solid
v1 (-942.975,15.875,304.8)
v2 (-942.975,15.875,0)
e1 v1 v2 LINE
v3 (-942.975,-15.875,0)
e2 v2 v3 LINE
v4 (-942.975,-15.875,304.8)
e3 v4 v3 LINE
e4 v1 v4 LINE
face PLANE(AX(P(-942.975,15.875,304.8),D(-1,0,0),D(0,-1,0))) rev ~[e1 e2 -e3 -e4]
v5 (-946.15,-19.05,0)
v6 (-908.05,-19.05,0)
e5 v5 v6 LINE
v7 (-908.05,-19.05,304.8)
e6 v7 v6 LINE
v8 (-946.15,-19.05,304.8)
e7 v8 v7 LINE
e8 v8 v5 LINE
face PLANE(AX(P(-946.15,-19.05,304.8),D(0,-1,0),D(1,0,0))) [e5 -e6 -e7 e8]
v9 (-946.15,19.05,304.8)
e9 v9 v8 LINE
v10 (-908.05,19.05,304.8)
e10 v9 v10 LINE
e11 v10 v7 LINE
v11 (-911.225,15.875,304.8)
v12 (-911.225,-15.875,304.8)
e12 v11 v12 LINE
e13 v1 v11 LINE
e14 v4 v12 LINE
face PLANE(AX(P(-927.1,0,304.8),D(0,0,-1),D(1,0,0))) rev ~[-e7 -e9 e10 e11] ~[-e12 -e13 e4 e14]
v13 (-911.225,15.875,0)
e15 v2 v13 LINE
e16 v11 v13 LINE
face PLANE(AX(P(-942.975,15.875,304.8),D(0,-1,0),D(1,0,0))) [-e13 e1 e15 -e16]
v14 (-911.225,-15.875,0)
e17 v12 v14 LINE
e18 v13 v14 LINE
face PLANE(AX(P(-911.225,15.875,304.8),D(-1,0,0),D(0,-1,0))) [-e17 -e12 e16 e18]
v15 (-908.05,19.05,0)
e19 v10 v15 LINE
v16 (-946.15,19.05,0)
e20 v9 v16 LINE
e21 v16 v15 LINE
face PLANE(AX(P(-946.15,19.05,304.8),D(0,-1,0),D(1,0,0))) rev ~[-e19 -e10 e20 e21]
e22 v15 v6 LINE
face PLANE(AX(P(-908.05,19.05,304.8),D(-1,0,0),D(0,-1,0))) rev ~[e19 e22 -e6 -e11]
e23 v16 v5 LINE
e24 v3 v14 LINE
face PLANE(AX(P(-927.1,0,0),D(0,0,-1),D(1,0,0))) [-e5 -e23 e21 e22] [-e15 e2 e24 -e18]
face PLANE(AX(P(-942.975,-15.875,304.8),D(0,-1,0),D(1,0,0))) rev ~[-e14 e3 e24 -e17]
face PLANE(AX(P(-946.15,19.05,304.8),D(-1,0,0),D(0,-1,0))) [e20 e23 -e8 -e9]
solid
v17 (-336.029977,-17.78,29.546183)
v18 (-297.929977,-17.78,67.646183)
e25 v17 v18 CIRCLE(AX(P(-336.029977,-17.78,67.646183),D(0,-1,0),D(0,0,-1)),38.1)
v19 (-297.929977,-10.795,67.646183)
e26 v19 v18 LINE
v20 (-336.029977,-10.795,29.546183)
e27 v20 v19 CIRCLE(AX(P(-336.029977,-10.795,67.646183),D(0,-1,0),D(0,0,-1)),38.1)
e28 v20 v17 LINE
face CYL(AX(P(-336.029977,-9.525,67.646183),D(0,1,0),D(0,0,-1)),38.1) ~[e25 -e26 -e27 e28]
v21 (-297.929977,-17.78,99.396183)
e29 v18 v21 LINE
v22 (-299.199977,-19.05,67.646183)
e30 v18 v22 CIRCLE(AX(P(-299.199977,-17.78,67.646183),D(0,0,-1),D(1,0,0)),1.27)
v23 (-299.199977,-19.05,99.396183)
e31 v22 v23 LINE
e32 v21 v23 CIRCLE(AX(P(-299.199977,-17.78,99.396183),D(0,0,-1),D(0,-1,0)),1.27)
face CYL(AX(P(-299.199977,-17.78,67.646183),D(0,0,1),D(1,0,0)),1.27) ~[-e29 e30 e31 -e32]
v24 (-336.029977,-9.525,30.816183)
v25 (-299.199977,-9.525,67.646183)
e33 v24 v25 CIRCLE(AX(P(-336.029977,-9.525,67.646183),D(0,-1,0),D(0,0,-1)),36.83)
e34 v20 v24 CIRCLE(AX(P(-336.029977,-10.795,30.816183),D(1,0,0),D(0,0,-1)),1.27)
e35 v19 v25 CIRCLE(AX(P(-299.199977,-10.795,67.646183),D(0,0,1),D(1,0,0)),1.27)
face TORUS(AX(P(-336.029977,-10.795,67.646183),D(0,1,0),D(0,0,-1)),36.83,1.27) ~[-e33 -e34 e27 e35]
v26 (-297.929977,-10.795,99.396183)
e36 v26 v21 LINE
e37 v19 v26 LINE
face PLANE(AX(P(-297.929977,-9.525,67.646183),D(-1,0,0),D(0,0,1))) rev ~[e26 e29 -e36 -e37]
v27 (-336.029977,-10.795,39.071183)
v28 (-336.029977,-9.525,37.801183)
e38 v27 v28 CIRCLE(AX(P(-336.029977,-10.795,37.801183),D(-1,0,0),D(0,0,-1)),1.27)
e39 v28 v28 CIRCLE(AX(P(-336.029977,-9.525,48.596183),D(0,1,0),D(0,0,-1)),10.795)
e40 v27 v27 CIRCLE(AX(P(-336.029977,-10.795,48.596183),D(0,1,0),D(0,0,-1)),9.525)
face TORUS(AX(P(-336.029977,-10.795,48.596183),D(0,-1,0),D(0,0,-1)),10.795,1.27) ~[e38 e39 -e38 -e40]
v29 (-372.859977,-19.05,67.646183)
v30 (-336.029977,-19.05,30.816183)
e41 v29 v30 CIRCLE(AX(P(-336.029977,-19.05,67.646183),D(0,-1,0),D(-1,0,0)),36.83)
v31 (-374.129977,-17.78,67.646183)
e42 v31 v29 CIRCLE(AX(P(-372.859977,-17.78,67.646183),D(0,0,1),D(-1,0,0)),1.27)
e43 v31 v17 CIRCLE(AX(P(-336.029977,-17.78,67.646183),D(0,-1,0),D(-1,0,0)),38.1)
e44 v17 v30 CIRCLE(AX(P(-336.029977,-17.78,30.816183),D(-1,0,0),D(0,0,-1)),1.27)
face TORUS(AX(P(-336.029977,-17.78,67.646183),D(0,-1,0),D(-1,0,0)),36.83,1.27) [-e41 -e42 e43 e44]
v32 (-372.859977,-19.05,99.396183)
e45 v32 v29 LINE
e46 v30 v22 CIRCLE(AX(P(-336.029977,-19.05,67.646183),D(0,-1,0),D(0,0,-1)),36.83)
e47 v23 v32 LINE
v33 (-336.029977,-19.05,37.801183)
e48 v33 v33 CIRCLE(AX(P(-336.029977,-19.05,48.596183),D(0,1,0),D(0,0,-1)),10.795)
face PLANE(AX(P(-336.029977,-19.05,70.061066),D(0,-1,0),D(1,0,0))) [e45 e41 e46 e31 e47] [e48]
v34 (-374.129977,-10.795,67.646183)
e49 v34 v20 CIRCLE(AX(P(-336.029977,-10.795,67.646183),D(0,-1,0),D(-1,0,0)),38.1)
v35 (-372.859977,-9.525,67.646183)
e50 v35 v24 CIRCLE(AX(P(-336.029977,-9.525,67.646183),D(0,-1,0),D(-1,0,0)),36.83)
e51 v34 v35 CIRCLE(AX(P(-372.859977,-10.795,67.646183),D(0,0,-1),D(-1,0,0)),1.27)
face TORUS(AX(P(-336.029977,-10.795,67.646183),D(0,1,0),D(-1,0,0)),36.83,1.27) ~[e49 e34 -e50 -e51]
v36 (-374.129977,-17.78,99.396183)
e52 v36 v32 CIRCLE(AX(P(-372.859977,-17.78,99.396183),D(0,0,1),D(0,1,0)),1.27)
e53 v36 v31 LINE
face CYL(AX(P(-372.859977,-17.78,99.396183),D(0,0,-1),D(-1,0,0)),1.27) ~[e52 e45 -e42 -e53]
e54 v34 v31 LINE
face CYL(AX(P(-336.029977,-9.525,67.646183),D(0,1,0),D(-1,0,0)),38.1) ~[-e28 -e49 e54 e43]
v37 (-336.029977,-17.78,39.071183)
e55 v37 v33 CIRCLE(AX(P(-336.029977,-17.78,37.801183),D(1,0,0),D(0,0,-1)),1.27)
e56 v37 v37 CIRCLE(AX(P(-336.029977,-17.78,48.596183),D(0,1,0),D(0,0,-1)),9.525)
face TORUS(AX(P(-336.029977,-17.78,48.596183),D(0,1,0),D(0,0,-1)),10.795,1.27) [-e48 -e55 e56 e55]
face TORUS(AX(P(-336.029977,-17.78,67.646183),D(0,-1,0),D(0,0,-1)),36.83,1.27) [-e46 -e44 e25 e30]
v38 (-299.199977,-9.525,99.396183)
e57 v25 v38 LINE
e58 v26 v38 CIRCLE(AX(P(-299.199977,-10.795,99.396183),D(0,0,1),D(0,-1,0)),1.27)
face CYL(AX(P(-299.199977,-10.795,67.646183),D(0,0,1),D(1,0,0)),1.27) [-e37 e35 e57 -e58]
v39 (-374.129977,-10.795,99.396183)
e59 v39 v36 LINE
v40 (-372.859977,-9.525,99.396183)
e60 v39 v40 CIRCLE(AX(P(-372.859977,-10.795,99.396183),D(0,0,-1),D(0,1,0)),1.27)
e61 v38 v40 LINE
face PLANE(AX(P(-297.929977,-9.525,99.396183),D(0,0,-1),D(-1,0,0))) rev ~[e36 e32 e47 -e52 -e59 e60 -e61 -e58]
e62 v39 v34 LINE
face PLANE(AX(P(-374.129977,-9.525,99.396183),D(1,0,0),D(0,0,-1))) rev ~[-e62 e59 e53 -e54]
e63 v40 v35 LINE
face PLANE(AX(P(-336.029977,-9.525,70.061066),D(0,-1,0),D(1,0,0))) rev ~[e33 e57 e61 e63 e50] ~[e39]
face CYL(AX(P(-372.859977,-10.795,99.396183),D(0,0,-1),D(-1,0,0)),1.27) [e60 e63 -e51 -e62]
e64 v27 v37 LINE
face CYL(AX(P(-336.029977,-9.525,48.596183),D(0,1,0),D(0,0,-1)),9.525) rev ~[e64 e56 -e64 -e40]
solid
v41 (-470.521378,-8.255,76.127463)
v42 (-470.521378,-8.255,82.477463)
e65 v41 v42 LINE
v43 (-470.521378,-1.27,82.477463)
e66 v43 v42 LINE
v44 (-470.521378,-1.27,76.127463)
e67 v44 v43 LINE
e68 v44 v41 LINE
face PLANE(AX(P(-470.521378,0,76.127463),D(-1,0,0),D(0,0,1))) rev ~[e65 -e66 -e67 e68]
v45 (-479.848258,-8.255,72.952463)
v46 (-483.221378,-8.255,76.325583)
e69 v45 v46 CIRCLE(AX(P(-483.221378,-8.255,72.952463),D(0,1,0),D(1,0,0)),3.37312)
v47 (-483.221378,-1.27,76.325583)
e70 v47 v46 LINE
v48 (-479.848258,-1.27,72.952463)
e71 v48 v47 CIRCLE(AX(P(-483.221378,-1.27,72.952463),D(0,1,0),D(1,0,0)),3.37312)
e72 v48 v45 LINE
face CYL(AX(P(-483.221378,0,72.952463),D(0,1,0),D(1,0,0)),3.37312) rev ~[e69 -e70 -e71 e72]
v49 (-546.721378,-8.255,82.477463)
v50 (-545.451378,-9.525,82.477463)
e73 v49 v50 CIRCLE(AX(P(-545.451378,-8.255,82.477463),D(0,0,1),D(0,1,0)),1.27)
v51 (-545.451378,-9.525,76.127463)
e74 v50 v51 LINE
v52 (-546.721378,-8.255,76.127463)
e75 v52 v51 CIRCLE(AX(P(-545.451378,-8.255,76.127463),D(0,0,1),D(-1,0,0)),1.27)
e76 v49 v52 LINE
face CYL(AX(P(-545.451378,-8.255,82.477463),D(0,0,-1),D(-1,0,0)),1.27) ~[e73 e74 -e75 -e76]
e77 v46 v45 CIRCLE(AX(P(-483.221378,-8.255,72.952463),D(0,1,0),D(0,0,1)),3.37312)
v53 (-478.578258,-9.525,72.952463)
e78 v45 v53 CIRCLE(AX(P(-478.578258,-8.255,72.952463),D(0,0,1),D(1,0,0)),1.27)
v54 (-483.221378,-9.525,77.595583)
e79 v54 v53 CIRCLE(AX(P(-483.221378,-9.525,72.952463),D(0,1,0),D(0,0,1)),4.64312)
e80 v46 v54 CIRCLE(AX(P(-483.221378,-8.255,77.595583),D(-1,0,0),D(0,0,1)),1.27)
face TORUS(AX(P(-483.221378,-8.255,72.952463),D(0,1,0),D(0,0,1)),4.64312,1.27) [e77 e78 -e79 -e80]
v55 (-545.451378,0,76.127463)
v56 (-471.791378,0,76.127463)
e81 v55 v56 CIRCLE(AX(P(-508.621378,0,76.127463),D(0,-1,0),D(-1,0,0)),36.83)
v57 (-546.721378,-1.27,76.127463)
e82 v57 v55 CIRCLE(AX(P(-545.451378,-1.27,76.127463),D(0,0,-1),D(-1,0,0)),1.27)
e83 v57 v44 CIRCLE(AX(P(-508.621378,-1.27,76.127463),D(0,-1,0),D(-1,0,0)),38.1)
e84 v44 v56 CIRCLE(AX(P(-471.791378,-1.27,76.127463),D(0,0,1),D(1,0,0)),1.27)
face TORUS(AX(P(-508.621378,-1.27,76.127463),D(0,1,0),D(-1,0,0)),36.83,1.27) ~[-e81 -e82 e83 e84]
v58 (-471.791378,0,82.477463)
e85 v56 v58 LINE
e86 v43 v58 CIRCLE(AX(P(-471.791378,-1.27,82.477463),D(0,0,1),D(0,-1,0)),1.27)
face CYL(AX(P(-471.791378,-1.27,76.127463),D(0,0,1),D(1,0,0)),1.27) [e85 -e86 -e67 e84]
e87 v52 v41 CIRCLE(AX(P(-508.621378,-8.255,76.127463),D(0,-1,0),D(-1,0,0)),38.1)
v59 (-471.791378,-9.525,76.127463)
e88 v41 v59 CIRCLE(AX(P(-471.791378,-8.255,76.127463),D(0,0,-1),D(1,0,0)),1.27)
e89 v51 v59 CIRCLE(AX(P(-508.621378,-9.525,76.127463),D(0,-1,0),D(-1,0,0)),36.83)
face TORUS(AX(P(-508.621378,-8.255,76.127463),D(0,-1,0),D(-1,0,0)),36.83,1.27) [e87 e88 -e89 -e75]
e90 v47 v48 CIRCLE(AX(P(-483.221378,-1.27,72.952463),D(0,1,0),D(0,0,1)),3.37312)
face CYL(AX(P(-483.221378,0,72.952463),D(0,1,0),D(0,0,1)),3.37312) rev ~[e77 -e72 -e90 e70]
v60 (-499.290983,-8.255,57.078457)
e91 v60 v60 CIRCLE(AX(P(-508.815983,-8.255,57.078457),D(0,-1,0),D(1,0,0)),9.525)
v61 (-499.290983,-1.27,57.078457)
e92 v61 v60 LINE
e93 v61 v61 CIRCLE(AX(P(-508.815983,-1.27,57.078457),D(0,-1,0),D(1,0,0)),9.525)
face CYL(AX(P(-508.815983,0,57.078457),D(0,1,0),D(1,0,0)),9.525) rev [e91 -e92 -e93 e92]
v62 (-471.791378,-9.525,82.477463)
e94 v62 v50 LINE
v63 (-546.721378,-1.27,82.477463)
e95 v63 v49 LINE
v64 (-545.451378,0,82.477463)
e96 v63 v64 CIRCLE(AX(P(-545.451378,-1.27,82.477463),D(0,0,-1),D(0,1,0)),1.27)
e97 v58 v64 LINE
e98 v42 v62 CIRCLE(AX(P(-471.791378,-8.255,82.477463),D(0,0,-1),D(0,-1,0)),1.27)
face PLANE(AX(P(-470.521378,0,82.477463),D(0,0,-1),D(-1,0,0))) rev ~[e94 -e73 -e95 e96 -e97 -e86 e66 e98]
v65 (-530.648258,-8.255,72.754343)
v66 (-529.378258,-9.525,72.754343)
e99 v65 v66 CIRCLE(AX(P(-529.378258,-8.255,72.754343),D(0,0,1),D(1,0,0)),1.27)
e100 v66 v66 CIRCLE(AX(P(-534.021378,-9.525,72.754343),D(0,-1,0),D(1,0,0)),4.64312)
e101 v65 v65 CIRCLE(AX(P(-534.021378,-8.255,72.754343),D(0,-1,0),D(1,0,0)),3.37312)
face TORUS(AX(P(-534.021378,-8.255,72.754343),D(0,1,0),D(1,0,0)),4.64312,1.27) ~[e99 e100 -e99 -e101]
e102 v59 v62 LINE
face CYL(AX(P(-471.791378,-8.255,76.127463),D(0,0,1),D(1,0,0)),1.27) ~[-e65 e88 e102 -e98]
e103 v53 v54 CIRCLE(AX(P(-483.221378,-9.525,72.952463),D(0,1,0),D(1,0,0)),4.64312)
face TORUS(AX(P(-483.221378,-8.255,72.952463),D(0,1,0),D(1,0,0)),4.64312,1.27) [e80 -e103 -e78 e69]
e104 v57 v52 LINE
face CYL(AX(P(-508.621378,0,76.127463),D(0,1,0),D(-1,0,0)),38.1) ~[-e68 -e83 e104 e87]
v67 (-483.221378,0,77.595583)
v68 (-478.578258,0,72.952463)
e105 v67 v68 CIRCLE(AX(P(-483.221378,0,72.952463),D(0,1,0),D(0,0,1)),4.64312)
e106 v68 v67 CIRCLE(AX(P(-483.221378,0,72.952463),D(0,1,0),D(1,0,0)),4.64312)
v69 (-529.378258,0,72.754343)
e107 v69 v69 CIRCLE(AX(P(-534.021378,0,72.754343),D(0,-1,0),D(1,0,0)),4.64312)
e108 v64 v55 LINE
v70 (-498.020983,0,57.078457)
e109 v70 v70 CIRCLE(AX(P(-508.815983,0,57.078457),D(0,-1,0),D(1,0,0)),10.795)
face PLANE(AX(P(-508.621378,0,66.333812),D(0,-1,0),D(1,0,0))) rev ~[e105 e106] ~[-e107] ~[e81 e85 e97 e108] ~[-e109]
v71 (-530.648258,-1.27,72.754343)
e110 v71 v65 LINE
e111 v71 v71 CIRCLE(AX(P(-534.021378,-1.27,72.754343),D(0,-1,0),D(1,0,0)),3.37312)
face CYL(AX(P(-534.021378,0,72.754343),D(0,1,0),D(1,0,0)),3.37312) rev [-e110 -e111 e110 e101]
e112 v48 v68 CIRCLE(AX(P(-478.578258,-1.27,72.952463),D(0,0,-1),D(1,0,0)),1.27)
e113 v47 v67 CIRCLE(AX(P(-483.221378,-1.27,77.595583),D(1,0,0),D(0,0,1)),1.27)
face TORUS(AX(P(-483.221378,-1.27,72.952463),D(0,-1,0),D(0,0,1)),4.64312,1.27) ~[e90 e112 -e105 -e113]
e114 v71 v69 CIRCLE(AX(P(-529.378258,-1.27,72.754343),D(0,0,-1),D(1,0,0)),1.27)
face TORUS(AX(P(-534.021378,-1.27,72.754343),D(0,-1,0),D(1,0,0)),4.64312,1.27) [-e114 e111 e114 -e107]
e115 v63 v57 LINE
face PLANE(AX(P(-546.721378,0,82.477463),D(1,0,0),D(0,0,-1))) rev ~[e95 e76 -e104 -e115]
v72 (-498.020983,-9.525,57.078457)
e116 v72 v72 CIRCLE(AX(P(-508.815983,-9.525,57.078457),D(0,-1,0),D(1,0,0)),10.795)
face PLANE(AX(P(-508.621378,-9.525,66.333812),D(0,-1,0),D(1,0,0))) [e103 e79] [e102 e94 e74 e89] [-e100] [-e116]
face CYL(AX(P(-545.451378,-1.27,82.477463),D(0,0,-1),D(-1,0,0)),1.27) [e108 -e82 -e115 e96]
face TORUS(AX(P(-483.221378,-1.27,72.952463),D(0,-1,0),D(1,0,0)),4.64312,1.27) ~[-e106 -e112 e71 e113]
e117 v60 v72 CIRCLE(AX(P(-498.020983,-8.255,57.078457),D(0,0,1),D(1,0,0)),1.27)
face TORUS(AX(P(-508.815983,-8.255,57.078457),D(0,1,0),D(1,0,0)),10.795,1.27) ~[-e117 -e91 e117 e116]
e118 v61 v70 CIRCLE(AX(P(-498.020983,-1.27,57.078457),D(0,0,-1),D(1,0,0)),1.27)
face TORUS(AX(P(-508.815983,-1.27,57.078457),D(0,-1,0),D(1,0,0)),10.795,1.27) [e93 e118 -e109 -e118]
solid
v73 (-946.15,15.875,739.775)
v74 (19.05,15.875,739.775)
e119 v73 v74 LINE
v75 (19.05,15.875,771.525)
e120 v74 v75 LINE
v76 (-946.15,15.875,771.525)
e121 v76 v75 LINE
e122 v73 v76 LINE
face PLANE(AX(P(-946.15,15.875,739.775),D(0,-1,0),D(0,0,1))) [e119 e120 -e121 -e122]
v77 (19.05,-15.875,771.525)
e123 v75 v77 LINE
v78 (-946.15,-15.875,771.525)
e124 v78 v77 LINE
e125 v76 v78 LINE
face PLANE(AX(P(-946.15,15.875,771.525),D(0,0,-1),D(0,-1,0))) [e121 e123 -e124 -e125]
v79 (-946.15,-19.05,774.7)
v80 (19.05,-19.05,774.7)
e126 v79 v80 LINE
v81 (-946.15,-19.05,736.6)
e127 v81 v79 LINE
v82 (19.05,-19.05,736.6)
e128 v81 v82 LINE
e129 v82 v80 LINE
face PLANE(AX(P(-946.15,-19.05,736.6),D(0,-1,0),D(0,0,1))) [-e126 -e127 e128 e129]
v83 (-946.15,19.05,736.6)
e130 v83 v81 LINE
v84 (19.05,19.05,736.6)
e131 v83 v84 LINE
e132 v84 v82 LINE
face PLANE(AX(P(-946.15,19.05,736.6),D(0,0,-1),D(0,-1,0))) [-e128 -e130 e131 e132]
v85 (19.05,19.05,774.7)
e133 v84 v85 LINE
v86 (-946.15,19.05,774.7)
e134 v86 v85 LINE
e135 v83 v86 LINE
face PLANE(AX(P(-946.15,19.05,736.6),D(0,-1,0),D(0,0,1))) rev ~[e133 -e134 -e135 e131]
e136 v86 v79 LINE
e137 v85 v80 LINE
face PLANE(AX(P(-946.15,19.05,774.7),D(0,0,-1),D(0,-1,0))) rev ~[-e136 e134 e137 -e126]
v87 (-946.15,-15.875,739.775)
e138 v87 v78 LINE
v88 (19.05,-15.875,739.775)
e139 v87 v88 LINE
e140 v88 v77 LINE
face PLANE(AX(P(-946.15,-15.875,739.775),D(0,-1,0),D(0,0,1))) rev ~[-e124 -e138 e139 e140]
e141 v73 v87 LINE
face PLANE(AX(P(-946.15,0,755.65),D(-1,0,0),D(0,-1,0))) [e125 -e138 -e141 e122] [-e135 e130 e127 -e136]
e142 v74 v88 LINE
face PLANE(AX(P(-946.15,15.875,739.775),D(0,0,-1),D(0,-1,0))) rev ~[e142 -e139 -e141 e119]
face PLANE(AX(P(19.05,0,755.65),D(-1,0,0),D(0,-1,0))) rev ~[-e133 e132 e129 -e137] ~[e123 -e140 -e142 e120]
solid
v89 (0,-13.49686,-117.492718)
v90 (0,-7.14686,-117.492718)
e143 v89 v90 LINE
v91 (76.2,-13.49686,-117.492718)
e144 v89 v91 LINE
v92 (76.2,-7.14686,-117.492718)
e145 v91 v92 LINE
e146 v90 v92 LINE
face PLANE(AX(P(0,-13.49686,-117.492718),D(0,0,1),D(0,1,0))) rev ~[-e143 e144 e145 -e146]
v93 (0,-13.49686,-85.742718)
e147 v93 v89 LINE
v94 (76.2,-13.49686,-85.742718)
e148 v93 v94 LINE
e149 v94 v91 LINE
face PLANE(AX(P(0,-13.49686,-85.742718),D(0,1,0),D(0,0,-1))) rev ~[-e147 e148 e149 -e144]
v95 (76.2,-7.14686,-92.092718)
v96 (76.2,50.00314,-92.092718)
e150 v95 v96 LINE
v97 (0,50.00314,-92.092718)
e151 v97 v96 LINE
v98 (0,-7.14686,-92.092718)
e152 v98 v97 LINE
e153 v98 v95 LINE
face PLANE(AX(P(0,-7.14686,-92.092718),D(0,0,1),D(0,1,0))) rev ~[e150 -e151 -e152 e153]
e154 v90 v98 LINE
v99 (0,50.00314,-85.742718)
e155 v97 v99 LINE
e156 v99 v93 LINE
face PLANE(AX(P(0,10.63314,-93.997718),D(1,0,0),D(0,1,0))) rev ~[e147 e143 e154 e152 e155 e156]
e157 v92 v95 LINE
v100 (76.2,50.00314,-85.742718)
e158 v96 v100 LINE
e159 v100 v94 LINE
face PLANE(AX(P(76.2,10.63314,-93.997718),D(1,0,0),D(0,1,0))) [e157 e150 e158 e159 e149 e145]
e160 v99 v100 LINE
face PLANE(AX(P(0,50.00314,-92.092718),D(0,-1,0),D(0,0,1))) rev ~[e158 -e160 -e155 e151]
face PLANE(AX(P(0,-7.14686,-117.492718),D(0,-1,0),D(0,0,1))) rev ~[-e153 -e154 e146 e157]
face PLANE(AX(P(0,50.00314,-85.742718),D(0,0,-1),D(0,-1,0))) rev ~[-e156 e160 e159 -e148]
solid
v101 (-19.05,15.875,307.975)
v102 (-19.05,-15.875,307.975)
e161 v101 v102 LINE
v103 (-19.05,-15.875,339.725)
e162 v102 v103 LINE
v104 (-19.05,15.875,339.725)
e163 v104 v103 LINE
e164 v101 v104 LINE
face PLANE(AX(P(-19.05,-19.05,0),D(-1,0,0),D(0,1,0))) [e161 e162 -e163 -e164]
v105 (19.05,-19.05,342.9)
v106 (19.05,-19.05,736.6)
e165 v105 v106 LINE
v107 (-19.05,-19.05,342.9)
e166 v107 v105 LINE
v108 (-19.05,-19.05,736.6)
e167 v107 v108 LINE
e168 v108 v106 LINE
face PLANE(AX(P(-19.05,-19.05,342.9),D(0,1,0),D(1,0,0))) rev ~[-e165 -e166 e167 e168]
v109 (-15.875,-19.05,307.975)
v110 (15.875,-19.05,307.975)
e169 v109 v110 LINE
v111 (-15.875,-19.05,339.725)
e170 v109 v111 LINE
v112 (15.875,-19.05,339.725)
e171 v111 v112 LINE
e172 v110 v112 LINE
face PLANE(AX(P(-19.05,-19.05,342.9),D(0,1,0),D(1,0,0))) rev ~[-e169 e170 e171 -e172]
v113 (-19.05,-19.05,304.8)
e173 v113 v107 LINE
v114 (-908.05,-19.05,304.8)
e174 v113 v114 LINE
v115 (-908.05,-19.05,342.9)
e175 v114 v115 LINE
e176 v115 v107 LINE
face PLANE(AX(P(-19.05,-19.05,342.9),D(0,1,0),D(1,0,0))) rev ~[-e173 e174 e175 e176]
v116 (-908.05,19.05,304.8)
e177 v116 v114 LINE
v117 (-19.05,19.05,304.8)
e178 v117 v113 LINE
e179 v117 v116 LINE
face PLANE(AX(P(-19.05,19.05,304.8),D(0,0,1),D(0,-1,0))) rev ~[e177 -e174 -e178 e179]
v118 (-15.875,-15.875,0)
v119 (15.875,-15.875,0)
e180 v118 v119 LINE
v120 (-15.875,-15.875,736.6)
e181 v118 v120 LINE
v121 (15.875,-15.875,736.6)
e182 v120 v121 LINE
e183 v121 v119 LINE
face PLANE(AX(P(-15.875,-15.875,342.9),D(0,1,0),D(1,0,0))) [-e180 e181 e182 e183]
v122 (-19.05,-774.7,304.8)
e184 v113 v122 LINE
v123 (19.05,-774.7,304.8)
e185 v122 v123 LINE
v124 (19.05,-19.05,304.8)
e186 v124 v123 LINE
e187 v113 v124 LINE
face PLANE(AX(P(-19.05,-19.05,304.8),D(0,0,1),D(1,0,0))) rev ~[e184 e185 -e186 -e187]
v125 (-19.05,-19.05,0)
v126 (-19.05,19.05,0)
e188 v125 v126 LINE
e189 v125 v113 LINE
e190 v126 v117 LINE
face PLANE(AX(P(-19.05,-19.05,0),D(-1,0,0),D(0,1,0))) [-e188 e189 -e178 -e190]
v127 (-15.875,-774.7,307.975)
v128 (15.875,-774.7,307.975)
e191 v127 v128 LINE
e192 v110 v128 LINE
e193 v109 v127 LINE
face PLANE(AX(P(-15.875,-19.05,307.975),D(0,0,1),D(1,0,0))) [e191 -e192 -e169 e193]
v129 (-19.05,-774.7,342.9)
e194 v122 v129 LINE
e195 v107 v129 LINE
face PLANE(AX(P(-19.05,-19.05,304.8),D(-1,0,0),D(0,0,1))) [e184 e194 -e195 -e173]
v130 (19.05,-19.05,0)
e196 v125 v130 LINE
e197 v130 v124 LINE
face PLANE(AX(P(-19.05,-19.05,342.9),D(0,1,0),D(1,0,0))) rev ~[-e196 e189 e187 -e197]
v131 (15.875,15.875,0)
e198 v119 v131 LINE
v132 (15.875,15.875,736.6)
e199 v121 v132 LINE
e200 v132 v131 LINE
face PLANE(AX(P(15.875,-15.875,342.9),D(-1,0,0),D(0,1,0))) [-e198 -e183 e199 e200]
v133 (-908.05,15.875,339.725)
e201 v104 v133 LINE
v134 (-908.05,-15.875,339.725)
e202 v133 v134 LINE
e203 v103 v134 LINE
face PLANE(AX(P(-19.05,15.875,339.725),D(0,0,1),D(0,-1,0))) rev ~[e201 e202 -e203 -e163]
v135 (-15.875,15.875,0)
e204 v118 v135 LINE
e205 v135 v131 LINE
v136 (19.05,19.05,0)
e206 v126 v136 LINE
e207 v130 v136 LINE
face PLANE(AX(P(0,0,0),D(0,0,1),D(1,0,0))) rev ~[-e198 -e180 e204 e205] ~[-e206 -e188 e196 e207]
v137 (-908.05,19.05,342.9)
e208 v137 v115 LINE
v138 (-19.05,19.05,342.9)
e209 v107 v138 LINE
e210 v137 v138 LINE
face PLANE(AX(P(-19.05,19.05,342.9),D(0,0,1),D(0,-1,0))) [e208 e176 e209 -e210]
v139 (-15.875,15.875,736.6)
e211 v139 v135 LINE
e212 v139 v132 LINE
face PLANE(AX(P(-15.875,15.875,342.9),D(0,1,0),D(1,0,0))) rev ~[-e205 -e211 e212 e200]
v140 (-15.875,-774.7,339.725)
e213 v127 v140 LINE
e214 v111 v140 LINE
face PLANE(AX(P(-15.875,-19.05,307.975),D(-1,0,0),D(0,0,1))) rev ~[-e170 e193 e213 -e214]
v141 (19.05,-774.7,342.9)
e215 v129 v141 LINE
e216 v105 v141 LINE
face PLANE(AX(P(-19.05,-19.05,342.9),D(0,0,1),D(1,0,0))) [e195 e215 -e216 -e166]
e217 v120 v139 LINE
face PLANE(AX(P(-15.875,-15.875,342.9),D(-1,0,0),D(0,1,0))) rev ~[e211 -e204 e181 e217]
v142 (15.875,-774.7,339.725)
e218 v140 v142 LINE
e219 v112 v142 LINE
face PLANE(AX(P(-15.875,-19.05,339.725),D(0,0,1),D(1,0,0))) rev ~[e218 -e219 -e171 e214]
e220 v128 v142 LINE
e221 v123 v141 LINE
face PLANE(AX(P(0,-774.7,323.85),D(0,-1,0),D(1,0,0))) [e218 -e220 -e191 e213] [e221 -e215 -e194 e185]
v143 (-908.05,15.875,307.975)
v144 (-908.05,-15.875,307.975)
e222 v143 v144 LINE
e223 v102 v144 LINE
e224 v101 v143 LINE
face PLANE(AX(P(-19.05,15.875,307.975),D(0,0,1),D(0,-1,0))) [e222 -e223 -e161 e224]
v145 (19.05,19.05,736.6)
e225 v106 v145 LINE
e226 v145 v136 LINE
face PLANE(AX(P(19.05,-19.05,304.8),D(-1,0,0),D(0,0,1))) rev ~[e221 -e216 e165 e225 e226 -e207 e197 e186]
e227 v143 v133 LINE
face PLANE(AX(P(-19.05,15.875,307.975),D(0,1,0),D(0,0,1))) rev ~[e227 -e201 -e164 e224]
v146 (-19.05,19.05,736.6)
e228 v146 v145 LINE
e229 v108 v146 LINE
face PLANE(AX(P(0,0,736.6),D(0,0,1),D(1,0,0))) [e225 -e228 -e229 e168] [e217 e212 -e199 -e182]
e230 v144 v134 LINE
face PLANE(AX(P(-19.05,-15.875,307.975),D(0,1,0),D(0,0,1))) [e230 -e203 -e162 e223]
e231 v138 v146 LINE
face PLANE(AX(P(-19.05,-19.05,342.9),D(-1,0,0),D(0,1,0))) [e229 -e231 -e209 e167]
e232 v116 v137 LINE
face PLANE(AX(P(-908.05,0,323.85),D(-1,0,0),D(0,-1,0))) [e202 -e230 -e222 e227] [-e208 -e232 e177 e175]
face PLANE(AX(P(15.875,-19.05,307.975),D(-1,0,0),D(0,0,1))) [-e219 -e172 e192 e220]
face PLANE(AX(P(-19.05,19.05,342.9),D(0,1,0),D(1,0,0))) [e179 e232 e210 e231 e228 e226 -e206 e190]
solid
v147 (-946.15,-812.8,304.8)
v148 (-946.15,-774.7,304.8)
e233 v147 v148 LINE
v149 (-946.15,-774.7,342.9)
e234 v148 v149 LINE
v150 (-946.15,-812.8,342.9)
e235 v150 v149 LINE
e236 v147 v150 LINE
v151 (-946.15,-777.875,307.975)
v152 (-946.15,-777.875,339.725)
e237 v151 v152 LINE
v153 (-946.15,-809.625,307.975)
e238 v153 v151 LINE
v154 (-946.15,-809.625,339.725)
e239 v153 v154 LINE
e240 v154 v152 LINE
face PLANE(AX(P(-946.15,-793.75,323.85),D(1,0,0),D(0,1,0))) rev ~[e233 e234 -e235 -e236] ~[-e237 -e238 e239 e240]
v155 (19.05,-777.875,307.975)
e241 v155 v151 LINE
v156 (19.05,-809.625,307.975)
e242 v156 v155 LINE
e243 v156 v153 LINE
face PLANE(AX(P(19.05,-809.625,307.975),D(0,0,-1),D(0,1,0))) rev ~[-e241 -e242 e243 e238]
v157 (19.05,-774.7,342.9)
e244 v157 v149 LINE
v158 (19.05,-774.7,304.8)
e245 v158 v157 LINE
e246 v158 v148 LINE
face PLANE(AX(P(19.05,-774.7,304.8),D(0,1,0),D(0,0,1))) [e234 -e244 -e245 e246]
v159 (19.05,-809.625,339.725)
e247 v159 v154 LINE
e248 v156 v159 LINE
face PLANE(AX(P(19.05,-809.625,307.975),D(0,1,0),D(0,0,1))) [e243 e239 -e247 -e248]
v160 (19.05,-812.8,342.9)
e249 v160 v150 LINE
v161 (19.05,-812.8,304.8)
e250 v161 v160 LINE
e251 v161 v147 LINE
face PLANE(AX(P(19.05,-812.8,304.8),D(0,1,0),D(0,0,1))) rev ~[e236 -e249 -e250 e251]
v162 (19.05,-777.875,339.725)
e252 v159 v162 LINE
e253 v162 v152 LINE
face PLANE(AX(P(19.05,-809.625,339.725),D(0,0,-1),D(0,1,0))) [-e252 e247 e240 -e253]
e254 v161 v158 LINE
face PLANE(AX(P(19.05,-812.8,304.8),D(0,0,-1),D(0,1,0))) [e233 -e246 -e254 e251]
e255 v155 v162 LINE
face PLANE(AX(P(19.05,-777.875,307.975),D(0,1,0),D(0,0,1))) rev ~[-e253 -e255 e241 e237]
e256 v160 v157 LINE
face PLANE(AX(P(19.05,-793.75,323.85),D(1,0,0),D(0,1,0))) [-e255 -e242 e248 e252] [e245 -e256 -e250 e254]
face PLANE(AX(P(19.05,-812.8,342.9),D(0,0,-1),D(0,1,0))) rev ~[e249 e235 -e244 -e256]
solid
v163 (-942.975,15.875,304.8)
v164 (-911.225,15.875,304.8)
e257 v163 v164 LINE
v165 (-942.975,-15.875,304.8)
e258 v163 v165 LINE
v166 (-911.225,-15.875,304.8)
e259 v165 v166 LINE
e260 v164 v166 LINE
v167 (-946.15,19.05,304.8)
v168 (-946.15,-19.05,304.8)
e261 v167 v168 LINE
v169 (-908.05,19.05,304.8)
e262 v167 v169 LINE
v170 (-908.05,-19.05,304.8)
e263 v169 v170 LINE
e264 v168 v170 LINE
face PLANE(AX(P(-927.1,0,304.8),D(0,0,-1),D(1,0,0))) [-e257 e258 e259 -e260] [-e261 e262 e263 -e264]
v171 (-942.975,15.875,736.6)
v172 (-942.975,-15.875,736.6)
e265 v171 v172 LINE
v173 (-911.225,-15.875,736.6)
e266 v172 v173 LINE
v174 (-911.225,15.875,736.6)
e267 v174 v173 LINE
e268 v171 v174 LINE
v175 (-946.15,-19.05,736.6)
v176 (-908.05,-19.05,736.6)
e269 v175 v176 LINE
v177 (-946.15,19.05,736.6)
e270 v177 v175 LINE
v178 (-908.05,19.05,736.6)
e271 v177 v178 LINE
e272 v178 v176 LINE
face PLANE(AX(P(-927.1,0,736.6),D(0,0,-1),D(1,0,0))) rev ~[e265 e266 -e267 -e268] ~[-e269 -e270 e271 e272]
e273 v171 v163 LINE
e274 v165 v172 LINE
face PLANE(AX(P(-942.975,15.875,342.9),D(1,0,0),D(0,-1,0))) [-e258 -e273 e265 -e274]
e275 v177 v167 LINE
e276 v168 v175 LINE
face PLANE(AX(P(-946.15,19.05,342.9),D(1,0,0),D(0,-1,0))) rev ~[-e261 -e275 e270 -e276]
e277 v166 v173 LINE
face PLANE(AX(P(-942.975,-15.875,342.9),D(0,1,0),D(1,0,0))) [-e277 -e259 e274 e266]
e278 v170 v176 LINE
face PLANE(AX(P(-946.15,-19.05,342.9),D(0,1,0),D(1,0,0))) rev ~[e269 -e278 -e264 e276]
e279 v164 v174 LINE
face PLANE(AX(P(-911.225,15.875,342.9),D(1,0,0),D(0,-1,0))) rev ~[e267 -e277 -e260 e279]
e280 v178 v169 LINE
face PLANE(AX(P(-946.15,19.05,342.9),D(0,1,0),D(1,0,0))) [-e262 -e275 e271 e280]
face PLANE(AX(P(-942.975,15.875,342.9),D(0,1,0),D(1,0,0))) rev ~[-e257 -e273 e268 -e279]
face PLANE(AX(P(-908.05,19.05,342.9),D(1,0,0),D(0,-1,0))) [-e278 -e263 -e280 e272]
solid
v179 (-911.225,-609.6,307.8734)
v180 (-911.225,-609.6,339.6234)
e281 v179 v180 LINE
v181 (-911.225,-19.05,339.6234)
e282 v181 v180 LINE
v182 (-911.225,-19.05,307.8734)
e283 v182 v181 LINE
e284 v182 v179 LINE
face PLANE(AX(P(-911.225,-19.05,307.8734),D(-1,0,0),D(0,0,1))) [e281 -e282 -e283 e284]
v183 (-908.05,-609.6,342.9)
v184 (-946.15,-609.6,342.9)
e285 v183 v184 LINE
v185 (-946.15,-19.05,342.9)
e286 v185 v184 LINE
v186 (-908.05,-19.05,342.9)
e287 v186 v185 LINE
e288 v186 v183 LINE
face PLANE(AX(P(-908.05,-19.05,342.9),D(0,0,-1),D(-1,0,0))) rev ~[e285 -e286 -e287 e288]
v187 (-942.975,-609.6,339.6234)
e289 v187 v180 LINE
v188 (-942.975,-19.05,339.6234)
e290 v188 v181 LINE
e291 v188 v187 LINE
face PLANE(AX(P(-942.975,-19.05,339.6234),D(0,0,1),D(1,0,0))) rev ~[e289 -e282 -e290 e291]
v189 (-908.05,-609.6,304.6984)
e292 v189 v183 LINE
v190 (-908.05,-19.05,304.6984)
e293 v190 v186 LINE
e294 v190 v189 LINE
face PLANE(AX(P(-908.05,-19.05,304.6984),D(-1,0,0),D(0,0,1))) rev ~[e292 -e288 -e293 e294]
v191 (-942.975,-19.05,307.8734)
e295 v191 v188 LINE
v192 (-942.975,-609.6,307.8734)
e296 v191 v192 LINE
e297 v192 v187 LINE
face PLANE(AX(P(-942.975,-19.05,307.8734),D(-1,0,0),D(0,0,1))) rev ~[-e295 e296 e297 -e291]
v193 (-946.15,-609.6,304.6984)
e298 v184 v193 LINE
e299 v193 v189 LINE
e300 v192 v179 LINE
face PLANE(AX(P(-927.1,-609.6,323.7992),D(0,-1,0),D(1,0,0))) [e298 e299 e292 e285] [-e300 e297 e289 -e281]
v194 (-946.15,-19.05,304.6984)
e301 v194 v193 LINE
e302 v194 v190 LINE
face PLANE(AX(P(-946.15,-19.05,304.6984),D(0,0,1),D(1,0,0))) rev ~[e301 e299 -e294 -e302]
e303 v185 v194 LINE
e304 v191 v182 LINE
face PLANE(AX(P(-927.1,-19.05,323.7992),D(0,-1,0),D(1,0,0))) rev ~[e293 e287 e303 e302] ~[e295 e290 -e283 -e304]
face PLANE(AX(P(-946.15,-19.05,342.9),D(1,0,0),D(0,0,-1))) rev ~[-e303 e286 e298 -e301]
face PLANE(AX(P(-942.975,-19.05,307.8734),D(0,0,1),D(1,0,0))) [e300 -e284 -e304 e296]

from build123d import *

# Parameters (mm, degrees)
F0_W      = 38.1
F0_H      = 38.1
F0_W_2    = 31.75
F0_H_2    = 31.75
F1_DEPTH  = 342.9
F2_W      = 38.1
F2_H      = 38.1
F2_W_2    = 31.75
F2_H_2    = 31.75
F3_DEPTH  = 889
F4_W      = 38.1
F4_H      = 38.1
F4_W_2    = 31.75
F4_H_2    = 31.75
F5_DEPTH  = 304.8
F6_DEPTH  = 38.1
F7_DEPTH  = 393.7
F8_W      = 38.1
F8_H      = 38.1
F8_W_2    = 31.75
F8_H_2    = 31.75
F9_DEPTH  = 393.7
F10_W     = 38.1
F10_H     = 38.1
F10_W_2   = 31.75
F10_H_2   = 31.75
F11_DEPTH = 965.2
F12_W     = 31.75
F12_H     = 31.75
F13_DEPTH = 590.55
F14_W     = 38.1
F14_H     = 38.1
F14_W_2   = 31.75
F14_H_2   = 31.75
F15_DEPTH = 755.65
F17_DEPTH = 76.2
F18_R     = 9.525
F18_R_2   = 3.37312
F19_DEPTH = 9.525
F20_R     = 1.27
F22_DEPTH = 9.525
F23_R     = 1.27
F24_W     = 38.1
F24_H     = 38.1
F24_W_2   = 31.75
F24_H_2   = 31.75
F25_DEPTH = 965.2


with BuildPart() as f1:
    # F0 (on Top) → F1 (new body)
    with BuildSketch(Plane.XY):
        Rectangle(F0_W, F0_H)
        Rectangle(F0_W_2, F0_H_2, mode=Mode.SUBTRACT)
    extrude(amount=F1_DEPTH)

    # F2 (on face) → F3 (join)
    with BuildSketch(Plane(origin=(-19.05, 0, 0), x_dir=(0, -1, 0), z_dir=(-1, 0, 0))):
        with Locations((0, 323.85)):
            Rectangle(F2_W, F2_H)
        with Locations((0, 323.85)):
            Rectangle(F2_W_2, F2_H_2, mode=Mode.SUBTRACT)
    extrude(amount=F3_DEPTH)

    # F8 (on face) → F9 (join)
    with BuildSketch(Plane.XY.offset(342.9)):
        Rectangle(F8_W, F8_H)
        Rectangle(F8_W_2, F8_H_2, mode=Mode.SUBTRACT)
    extrude(amount=F9_DEPTH)

    # F14 (on face) → F15 (join)
    with BuildSketch(Plane.XZ.offset(19.05)):
        with Locations((0, 323.85)):
            Rectangle(F14_W, F14_H)
        with Locations((0, 323.85)):
            Rectangle(F14_W_2, F14_H_2, mode=Mode.SUBTRACT)
    extrude(amount=F15_DEPTH)


with BuildPart() as f5:
    # F4 (on face) → F5 (new body)
    with BuildSketch(Plane(origin=(0, 0, 304.8), x_dir=(1, 0, 0), z_dir=(0, 0, -1))):
        with Locations((-927.1, 0)):
            Rectangle(F4_W, F4_H)
        with Locations((-927.1, 0)):
            Rectangle(F4_W_2, F4_H_2, mode=Mode.SUBTRACT)
    extrude(amount=F5_DEPTH)


with BuildPart() as f6:
    # F6 (new): a face of the model
    f6_faces = [f5.part.faces().sort_by_distance(p)[0] for p in [
        (-908.5888153673, 0, 304.8),
    ]]
    extrude(f6_faces, amount=F6_DEPTH)

    # F7 (add): a face of the model
    f7_faces = [f6.faces().sort_by_distance(p)[0] for p in [
        (-908.5888153673, 0, 342.9),
    ]]
    extrude(f7_faces, amount=F7_DEPTH)


with BuildPart() as f11:
    # F10 (on face) → F11 (new body)
    with BuildSketch(Plane(origin=(-946.15, 0, 0), x_dir=(0, -1, 0), z_dir=(-1, 0, 0))):
        with Locations((0, 755.65)):
            Rectangle(F10_W, F10_H)
        with Locations((0, 755.65)):
            Rectangle(F10_W_2, F10_H_2, mode=Mode.SUBTRACT)
    extrude(amount=-F11_DEPTH)


with BuildPart() as f13:
    # F12 (on face) → F13 (new body)
    with BuildSketch(Plane.XZ.offset(19.05)):
        Polygon((-908.05, 304.8), (-908.05, 342.9), (-946.15, 342.9), (-946.15, 304.6984), (-908.05, 304.6984), align=None)
        with Locations((-927.1, 323.7484)):
            Rectangle(F12_W, F12_H, mode=Mode.SUBTRACT)
    extrude(amount=F13_DEPTH)


with BuildPart() as f17:
    # F16 (on Right) → F17 (new body)
    with BuildSketch(Plane.YZ):
        Polygon((50.0031399928, -92.0927183867), (50.0031399928, -85.7427183867), (-13.4968600072, -85.7427183867), (-13.4968600072, -117.4927183867), (-7.1468600072, -117.4927183867), (-7.1468600072, -92.0927183867), align=None)
    extrude(amount=F17_DEPTH)


with BuildPart() as f19:
    # F18 (on Front) → F19 (new body)
    with BuildSketch(Plane.XZ):
        with BuildLine():
            Line((-546.7213775635, 82.477462914), (-546.7213775635, 76.127462914))
            ThreePointArc((-546.7213775635, 76.127462914), (-508.6213775635, 38.027462914), (-470.5213775635, 76.127462914))
            Line((-470.5213775635, 76.127462914), (-470.5213775635, 82.477462914))
            Line((-470.5213775635, 82.477462914), (-483.2213775635, 82.477462914))
            Line((-483.2213775635, 82.477462914), (-546.7213775635, 82.477462914))
        make_face()
        with Locations((-508.8159826909, 57.0784569335)):
            Circle(F18_R, mode=Mode.SUBTRACT)
        with Locations((-534.0213775635, 72.754342914)):
            Circle(F18_R_2, mode=Mode.SUBTRACT)
        with BuildLine():
            ThreePointArc((-479.8482575635, 72.952462914), (-485.6065335892, 70.5673068883), (-483.2213775635, 76.325582914))
            ThreePointArc((-483.2213775635, 76.325582914), (-480.8362215377, 75.3376189398), (-479.8482575635, 72.952462914))
        make_face(mode=Mode.SUBTRACT)
    extrude(amount=F19_DEPTH)

    # F20
    f20_edges = [f19.edges().sort_by_distance(p)[0] for p in [
        (-537.394498, -9.525, 72.754343),
        (-518.340983, -9.525, 57.078457),
        (-483.221378, -9.525, 69.579343),
        (-508.621378, -9.525, 38.027463),
        (-483.221378, 0, 69.579343),
        (-537.394498, 0, 72.754343),
        (-518.340983, 0, 57.078457),
        (-508.621378, 0, 38.027463),
    ]]
    fillet(f20_edges, radius=F20_R)


with BuildPart() as f22:
    # F21 (on face) → F22 (new body)
    with BuildSketch(Plane.XZ.offset(9.525)):
        with BuildLine():
            Line((-374.1299766064, 99.3961830735), (-374.1299766064, 67.6461830735))
            ThreePointArc((-374.1299766064, 67.6461830735), (-362.9707449696, 40.7054147103), (-336.0299766064, 29.5461830735))
            ThreePointArc((-336.0299766064, 29.5461830735), (-309.0892082432, 40.7054147103), (-297.9299766064, 67.6461830735))
            Line((-297.9299766064, 67.6461830735), (-297.9299766064, 99.3961830735))
            Line((-297.9299766064, 99.3961830735), (-374.1299766064, 99.3961830735))
        make_face()
        with BuildLine():
            ThreePointArc((-326.5049766064, 48.5961830735), (-329.2947845156, 41.8609909827), (-336.0299766064, 39.0711830735))
            ThreePointArc((-336.0299766064, 39.0711830735), (-342.7651686972, 55.3313751643), (-326.5049766064, 48.5961830735))
        make_face(mode=Mode.SUBTRACT)
    extrude(amount=F22_DEPTH)

    # F23
    f23_edges = [f22.edges().sort_by_distance(p)[0] for p in [
        (-345.554977, -19.05, 48.596183),
        (-336.029977, -19.05, 29.546183),
        (-297.929977, -19.05, 83.521183),
        (-374.129977, -19.05, 83.521183),
        (-345.554977, -9.525, 48.596183),
        (-336.029977, -9.525, 29.546183),
        (-297.929977, -9.525, 83.521183),
        (-374.129977, -9.525, 83.521183),
    ]]
    fillet(f23_edges, radius=F23_R)


with BuildPart() as f25:
    # F24 (on face) → F25 (new body)
    with BuildSketch(Plane.YZ.offset(19.05)):
        with Locations((-793.75, 323.85)):
            Rectangle(F24_W, F24_H)
        with Locations((-793.75, 323.85)):
            Rectangle(F24_W_2, F24_H_2, mode=Mode.SUBTRACT)
    extrude(amount=-F25_DEPTH)


solid = Compound([f1.part, f5.part, f6.part, f11.part, f13.part, f17.part, f19.part, f22.part, f25.part])
